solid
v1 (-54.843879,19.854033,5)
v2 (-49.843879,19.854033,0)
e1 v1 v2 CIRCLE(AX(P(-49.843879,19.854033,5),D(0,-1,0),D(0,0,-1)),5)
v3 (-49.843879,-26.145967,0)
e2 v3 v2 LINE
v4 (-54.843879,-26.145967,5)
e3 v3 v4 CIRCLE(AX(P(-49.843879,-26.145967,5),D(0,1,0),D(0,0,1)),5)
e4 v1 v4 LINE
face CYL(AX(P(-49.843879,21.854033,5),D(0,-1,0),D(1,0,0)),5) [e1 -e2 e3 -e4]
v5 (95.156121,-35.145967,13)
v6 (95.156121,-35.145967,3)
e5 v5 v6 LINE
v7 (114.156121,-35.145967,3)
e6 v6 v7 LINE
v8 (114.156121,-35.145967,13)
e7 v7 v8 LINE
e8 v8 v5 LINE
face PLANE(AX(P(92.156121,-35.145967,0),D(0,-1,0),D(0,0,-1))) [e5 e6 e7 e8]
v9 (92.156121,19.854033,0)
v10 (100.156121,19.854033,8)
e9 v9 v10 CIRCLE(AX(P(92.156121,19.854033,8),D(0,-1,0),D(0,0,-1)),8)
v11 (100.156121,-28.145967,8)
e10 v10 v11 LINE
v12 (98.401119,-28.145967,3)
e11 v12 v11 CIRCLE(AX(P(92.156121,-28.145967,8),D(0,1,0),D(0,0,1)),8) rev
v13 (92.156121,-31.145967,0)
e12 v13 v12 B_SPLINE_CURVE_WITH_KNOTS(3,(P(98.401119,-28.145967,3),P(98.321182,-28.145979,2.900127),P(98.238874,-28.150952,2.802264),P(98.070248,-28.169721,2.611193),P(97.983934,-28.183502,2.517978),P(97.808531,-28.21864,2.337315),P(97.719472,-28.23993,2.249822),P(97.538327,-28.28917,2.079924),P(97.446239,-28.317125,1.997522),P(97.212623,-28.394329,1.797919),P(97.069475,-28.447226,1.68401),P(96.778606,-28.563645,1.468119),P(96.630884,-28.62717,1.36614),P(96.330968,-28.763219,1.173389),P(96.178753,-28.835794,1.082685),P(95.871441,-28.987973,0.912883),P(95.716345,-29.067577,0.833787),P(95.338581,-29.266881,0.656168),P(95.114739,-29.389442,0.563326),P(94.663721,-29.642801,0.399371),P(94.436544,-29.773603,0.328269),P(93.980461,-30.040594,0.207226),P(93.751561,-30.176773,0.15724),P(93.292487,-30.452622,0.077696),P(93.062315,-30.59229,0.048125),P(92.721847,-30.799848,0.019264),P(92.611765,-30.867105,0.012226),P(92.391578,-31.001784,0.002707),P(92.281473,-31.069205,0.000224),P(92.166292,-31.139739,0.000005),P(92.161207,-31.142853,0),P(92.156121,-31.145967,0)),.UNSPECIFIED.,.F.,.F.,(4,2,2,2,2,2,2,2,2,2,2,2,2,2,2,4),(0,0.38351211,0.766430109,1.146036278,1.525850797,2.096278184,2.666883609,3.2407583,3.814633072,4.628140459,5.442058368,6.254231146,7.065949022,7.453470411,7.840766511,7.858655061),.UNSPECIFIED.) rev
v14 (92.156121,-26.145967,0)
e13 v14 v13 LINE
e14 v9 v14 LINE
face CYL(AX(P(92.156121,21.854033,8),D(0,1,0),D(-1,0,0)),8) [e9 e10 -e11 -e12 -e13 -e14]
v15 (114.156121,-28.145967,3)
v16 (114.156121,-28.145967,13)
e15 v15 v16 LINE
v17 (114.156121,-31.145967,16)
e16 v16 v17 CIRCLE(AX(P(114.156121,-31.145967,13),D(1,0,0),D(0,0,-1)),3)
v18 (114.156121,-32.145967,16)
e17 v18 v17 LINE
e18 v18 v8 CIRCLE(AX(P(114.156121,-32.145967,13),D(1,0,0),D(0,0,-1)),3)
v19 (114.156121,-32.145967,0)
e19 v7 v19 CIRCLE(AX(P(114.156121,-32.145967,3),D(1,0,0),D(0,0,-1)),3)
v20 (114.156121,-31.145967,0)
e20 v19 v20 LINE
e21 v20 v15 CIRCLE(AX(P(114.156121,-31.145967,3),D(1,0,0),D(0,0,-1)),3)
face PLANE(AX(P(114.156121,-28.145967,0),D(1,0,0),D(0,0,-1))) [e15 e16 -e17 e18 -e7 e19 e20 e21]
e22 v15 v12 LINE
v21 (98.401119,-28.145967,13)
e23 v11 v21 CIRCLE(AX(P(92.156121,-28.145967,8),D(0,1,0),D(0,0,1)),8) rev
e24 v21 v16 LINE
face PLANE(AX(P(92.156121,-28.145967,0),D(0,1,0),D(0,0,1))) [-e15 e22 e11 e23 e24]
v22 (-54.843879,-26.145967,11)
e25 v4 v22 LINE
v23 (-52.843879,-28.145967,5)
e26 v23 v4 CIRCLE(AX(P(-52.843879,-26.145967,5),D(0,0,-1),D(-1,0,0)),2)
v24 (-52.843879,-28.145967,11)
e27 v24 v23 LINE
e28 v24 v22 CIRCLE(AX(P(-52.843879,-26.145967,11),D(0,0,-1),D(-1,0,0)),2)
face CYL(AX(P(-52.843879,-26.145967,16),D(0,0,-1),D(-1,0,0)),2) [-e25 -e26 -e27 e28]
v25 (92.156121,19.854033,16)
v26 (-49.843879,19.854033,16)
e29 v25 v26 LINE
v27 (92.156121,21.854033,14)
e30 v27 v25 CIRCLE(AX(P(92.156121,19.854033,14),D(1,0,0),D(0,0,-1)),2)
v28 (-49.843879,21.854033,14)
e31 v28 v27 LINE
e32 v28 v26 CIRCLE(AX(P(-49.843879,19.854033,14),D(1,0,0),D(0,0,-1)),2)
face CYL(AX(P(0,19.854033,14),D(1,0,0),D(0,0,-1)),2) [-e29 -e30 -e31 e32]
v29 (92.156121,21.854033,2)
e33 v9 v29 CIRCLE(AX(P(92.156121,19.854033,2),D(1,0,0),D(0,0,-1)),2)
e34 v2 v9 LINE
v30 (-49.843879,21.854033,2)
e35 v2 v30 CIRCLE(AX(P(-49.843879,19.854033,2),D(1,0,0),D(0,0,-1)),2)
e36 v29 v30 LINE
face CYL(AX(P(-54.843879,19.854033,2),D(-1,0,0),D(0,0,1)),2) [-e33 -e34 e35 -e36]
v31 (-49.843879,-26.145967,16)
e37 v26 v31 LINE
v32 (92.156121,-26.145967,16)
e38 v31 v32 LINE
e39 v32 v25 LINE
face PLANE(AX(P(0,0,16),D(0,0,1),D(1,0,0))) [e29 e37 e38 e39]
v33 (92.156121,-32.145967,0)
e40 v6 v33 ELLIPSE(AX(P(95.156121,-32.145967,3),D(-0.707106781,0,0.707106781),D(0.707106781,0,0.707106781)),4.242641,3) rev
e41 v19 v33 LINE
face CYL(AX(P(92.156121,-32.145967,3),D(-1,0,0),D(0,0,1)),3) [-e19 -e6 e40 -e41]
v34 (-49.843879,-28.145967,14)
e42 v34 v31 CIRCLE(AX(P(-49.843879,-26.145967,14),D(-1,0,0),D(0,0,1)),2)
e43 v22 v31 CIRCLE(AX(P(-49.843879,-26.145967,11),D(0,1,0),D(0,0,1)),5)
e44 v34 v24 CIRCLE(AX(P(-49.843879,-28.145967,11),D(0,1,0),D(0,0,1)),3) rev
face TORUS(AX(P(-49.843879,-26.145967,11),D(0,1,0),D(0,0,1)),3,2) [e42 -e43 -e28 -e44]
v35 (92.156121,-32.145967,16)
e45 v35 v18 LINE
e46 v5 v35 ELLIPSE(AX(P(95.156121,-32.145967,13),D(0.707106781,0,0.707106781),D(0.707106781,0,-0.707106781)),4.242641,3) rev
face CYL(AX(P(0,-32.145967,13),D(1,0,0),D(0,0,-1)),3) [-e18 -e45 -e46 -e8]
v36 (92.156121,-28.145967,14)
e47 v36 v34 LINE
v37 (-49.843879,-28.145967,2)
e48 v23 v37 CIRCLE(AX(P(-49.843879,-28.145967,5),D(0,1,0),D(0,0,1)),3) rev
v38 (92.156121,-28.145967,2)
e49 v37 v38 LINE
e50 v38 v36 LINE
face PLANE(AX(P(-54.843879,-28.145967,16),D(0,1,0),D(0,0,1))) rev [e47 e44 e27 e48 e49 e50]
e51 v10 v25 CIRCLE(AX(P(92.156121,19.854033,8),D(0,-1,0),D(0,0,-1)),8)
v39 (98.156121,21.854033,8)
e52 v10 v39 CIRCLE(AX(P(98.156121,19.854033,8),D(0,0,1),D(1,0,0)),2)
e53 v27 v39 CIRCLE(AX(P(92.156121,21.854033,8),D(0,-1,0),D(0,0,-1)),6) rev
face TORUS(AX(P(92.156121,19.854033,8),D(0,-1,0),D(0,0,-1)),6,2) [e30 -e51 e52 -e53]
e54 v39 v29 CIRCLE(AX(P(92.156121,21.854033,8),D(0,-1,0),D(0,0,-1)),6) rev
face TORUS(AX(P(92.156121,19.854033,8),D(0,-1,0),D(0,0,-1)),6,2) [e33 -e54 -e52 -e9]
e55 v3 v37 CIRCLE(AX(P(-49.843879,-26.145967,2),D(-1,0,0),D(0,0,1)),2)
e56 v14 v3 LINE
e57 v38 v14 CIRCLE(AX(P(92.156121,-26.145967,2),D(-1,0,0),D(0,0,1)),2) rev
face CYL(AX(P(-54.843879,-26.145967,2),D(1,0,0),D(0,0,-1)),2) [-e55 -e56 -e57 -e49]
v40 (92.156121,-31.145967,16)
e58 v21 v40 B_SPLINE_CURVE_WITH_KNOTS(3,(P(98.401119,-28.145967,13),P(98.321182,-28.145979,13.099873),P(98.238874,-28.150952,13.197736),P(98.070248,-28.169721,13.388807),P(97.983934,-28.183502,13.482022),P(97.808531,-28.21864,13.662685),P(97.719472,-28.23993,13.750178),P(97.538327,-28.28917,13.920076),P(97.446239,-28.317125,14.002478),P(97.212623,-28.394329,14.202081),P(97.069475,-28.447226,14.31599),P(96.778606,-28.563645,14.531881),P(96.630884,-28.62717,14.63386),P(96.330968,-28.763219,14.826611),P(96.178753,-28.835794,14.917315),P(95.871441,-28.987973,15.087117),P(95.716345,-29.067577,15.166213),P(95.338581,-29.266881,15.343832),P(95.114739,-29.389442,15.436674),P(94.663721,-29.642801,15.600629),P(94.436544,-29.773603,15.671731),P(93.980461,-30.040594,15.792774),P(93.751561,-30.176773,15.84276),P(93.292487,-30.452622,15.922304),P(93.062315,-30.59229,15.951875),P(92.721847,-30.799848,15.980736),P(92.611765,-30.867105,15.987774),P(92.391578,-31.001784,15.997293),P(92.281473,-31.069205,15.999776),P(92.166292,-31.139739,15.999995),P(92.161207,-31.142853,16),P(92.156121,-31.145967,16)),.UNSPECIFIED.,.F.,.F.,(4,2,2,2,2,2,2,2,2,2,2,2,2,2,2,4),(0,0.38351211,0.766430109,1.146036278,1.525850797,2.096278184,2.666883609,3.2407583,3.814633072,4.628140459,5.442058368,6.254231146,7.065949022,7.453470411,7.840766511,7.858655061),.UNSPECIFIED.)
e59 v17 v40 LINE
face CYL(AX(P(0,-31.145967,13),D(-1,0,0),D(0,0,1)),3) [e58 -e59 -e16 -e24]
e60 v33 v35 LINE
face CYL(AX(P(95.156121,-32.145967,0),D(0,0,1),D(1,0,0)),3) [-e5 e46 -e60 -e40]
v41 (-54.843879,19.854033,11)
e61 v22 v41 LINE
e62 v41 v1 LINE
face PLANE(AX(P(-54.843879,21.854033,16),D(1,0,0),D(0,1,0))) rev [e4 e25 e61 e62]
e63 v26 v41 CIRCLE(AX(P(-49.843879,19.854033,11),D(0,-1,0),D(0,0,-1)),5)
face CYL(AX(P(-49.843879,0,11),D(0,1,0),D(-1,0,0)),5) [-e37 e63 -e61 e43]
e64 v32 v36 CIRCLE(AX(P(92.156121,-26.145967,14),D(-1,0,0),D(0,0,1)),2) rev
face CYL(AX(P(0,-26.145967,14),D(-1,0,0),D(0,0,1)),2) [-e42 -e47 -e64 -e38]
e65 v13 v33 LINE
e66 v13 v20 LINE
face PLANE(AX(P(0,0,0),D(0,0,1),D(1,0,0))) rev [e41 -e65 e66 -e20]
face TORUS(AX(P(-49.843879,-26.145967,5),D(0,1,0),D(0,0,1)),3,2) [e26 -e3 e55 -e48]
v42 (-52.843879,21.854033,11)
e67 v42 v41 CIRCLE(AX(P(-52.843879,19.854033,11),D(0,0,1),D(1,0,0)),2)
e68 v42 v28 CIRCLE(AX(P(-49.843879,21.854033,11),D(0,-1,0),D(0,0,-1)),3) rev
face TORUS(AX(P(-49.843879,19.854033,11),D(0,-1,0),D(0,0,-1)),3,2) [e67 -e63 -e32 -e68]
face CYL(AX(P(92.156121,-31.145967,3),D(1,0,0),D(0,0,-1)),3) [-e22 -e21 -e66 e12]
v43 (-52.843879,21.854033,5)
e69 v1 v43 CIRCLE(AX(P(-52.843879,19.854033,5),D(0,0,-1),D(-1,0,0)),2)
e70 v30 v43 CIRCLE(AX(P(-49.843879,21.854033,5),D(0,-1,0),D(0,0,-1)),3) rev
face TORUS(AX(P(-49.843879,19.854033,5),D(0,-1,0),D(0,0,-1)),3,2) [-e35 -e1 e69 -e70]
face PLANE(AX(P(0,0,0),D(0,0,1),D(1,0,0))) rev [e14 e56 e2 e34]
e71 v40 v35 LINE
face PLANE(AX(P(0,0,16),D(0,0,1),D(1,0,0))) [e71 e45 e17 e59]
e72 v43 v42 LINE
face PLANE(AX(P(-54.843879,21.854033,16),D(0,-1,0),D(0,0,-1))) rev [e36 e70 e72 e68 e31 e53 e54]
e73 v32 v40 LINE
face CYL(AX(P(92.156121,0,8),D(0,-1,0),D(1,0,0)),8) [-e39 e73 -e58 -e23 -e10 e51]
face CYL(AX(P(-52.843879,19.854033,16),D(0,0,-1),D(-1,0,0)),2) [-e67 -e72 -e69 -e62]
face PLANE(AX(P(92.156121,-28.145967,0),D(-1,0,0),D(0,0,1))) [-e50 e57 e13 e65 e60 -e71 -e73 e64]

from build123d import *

# Parameters (mm, degrees)
CROQUIS1_W              = 155
CROQUIS1_H              = 50
SALIENTE_EXTRUIR1_DEPTH = 16
CROQUIS4_W              = 22
CROQUIS4_H              = 7
SALIENTE_EXTRUIR2_DEPTH = 16
REDONDEO1_R             = 3
REDONDEO2_R             = 5
REDONDEO3_START         = 92.156121327
REDONDEO3_DEPTH         = 8.0000001
REDONDEO4_R             = 2


with BuildPart() as part:
    # Croquis1 → Saliente-Extruir1 (new body)
    with BuildSketch(Plane.XY):
        with Locations((22.656121427, -3.145967168)):
            Rectangle(CROQUIS1_W, CROQUIS1_H)
    extrude(amount=SALIENTE_EXTRUIR1_DEPTH)

    # Croquis4 → Saliente-Extruir2 (add)
    with BuildSketch(Plane.XY.offset(16)):
        with Locations((103.156121427, -31.645967168)):
            Rectangle(CROQUIS4_W, CROQUIS4_H)
    extrude(amount=-SALIENTE_EXTRUIR2_DEPTH)

    # Redondeo1
    redondeo1_edges = [part.edges().sort_by_distance(p)[0] for p in [
        (107.156121427, -28.145967168, 16),
        (107.156121427, -28.145967168, 0),
        (103.156121427, -35.145967168, 16),
        (103.156121427, -35.145967168, 0),
        (92.156121427, -35.145967168, 8),
    ]]
    fillet(redondeo1_edges, radius=REDONDEO1_R)

    # Redondeo2
    redondeo2_edges = [part.edges().sort_by_distance(p)[0] for p in [
        (-54.843878573, -3.145967168, 0),
        (-54.843878573, -3.145967168, 16),
    ]]
    fillet(redondeo2_edges, radius=REDONDEO2_R)

    # Redondeo3: read off the stored shape, not the designer's step
    # Redondeo3 outline → Redondeo3 (cut)
    with BuildSketch(Plane.YZ.offset(REDONDEO3_START)):
        with BuildLine():
            Line((-28.145967168, 13), (-28.145967168, 3))
            ThreePointArc((-28.145967168, 3), (-29.024646824, 0.878679656), (-31.145967168, 0))
            Line((-31.145967168, 0), (21.854032832, 0))
            Line((21.854032832, 0), (21.854032832, 16))
            Line((21.854032832, 16), (-31.145967168, 16))
            ThreePointArc((-31.145967168, 16), (-29.024646824, 15.121320344), (-28.145967168, 13))
        make_face()
    extrude(amount=REDONDEO3_DEPTH, mode=Mode.SUBTRACT)

    # Redondeo3 2: loft between two sections, ruled curve by curve
    redondeo3_2_from = [
        Edge.make_three_point_arc((100.156121427, 21.854032832, 8), (97.812975677, 21.854032832, 13.656854249), (92.156121427, 21.854032832, 16)),
        Edge.make_three_point_arc((100.156121427, 21.854032832, 8), (97.812975677, 21.854032832, 2.343145751), (92.156121427, 21.854032832, 0)),
        Edge.make_line((92.156121427, 21.854032832, 0), (92.156121427, 21.854032832, 16)),
    ]
    redondeo3_2_to = [
        Edge.make_three_point_arc((100.156121427, -31.145967168, 8), (97.812975677, -31.145967168, 13.656854249), (92.156121427, -31.145967168, 16)),
        Edge.make_three_point_arc((100.156121427, -31.145967168, 8), (97.812975677, -31.145967168, 2.343145751), (92.156121427, -31.145967168, 0)),
        Edge.make_line((92.156121427, -31.145967168, 0), (92.156121427, -31.145967168, 16)),
    ]
    redondeo3_2 = Solid(Shell([*[Face.make_surface_from_curves(redondeo3_2_from[k], redondeo3_2_to[k]) for k in range(3)], Face(Wire(redondeo3_2_from)), Face(Wire(redondeo3_2_to))]))
    add(redondeo3_2)

    # Redondeo4
    redondeo4_edges = [part.edges().sort_by_distance(p)[0] for p in [
        (97.812975677, 21.854032832, 13.656854249),
        (97.812975677, 21.854032832, 2.343145751),
        (-53.379412479, 21.854032832, 1.464466094),
        (-54.843878573, 21.854032832, 8),
        (-53.379412479, 21.854032832, 14.535533906),
        (-53.379412479, -28.145967168, 1.464466094),
        (-54.843878573, -28.145967168, 8),
        (-53.379412479, -28.145967168, 14.535533906),
        (21.156121377, 21.854032832, 0),
        (21.156121377, 21.854032832, 16),
        (21.156121427, -28.145967168, 0),
        (21.156121427, -28.145967168, 16),
    ]]
    fillet(redondeo4_edges, radius=REDONDEO4_R)


solid = part.part
